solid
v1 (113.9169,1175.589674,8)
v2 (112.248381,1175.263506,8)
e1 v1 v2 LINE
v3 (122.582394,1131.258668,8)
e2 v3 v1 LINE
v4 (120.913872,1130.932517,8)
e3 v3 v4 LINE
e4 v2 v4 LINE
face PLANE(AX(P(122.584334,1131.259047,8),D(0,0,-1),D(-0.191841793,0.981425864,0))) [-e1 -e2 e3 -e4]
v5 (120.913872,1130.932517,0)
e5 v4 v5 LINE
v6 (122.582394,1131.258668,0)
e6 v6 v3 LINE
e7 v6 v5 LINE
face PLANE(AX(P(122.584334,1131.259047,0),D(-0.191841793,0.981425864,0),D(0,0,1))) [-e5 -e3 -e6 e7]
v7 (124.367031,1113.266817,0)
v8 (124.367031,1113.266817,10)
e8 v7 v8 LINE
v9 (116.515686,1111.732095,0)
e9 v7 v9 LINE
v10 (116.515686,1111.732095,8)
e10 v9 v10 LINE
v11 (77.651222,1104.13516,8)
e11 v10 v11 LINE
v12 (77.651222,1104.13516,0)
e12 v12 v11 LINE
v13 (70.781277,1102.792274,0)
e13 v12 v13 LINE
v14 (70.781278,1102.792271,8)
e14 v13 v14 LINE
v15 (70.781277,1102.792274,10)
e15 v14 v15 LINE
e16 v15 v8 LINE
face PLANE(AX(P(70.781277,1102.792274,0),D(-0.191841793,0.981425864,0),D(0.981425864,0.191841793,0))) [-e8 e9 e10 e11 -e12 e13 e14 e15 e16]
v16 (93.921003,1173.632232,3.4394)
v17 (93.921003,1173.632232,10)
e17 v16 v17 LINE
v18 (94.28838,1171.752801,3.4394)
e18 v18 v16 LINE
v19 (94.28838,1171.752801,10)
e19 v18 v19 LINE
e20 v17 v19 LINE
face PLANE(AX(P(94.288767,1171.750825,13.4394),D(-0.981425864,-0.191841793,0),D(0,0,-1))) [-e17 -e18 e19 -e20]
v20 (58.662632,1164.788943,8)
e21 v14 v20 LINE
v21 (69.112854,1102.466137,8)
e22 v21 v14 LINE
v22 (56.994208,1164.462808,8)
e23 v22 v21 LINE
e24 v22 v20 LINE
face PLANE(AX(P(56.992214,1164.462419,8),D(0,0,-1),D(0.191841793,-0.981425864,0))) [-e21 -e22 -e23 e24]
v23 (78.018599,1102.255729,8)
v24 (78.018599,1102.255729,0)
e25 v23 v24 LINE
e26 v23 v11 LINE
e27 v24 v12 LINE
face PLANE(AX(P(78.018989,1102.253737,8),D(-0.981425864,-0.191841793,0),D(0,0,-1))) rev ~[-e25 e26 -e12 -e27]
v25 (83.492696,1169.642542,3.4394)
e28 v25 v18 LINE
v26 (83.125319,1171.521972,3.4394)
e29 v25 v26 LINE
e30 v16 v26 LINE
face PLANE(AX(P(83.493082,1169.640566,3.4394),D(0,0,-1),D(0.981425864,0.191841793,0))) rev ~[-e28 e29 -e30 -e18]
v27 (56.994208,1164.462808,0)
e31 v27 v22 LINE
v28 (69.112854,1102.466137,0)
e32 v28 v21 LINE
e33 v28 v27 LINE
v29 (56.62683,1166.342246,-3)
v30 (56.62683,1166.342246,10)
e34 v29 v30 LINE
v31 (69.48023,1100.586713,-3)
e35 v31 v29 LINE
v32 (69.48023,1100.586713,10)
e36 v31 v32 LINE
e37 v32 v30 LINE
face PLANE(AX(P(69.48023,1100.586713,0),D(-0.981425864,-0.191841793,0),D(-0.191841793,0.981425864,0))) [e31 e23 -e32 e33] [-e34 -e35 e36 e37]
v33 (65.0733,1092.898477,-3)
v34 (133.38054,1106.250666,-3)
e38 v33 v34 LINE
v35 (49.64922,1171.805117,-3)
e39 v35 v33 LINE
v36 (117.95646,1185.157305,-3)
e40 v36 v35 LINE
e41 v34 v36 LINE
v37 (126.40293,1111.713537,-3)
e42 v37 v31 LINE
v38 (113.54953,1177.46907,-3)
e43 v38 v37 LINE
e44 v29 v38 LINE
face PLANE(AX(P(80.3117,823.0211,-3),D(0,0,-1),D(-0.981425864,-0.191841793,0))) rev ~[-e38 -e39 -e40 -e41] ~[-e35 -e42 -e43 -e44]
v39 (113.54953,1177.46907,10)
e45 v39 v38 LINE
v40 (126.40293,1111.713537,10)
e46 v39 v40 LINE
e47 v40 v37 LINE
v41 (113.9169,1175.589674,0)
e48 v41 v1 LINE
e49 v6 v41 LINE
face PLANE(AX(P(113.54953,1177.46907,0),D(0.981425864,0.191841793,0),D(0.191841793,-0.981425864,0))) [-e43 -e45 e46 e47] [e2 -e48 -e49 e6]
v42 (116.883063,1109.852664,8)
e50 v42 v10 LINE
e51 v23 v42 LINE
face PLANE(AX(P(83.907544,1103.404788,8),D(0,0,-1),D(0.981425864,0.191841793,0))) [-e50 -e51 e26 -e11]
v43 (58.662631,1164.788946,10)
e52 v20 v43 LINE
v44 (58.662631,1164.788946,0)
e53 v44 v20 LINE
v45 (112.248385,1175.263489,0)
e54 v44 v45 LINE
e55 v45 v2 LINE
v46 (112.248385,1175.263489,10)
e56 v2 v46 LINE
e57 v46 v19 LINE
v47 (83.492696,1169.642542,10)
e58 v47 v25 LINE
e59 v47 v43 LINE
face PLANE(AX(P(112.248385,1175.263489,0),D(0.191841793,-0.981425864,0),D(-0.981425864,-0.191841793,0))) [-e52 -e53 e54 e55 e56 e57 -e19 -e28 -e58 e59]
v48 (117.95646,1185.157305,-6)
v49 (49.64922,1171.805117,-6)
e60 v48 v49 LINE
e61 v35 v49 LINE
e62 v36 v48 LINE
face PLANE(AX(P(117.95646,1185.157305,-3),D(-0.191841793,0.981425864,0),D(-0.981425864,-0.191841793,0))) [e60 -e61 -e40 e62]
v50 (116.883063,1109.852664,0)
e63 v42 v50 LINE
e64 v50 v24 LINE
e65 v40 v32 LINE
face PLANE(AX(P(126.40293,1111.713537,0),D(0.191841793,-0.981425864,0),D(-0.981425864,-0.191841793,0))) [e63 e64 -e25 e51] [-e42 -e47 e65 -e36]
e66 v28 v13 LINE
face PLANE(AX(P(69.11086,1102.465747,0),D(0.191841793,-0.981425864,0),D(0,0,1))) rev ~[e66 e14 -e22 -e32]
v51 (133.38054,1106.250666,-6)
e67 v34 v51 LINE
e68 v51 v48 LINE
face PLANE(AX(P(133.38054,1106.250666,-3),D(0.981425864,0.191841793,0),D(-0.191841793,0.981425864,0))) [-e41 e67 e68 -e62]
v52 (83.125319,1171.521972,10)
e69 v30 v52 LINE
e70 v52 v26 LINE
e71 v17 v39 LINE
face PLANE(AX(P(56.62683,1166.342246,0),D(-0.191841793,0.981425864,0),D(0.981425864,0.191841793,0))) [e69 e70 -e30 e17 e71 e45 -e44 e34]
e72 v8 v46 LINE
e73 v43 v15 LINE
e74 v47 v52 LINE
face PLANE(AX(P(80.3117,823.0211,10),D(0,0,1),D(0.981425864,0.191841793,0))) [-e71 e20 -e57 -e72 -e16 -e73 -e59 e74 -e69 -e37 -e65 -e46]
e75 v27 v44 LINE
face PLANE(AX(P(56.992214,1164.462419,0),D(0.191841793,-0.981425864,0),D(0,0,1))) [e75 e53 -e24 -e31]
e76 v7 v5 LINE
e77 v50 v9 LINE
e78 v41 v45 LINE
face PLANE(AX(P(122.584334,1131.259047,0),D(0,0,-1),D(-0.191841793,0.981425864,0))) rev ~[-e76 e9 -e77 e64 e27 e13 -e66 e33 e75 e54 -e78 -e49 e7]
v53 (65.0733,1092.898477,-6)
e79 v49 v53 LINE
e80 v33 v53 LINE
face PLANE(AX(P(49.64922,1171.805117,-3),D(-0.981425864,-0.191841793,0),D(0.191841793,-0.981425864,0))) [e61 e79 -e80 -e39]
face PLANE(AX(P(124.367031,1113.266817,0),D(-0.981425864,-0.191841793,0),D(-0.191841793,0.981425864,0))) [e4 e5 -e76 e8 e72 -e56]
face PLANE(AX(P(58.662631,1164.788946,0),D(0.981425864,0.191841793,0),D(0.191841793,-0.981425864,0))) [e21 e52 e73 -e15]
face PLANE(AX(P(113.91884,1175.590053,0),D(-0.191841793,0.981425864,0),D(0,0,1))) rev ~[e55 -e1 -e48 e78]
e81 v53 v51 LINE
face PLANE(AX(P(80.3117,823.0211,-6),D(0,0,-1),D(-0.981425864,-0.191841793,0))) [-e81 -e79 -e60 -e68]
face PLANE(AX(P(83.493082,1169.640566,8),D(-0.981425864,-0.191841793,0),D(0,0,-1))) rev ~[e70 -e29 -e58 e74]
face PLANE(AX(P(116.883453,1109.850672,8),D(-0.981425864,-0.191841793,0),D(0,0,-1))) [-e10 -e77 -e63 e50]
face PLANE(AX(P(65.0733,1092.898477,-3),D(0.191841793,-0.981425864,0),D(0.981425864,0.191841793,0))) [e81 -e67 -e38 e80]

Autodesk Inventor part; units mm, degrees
ref_plane "YZ Plane" through (0, 0, 0) normal (1, 0, 0) x (0, 1, 0)
ref_plane "XZ Plane" through (0, 0, 0) normal (0, 1, 0) x (-1, 0, 0)
ref_plane "XY Plane" through (0, 0, 0) normal (0, 0, 1) x (1, 0, 0)
ref_plane "Work Plane1" through (80.3117, 823.0211, 0) normal (0, 0, 1) x (0.9814259, 0.1918418, 0)
sketch "Sketch1" plane through (80.3117, 823.0211, 0) normal (0, 0, 1) x (0.9814259, 0.1918418, 0)
  line L0 (98.9183, 339.573) -> (44.3184, 339.573)
  line L1 (44.3184, 339.573) -> (44.3184, 276.403)
  line L2 (44.3184, 276.403) -> (98.9183, 276.403)
  line L3 (98.9183, 276.403) -> (98.9183, 339.573)
  line L4 (98.9183, 339.573) -> (44.3184, 276.403)
  line L5 (42.6184, 341.488) -> (100.6184, 341.488)
  line L6 (100.6184, 341.488) -> (100.6184, 274.488)
  line L7 (100.6184, 274.488) -> (42.6184, 274.488)
  line L8 (42.6184, 274.488) -> (42.6184, 341.488)
  line L9 (42.6184, 341.488) -> (100.6184, 274.488) construction
  line L10 (100.6184, 341.488) -> (42.6184, 274.488) construction
  line L11 (98.9183, 339.573) -> (44.3184, 339.573)
  line L12 (44.3184, 339.573) -> (44.3184, 276.403)
  line L13 (44.3184, 276.403) -> (98.9183, 276.403)
  line L14 (98.9183, 276.403) -> (98.9183, 339.573)
  line L15 (98.9183, 339.573) -> (44.3184, 276.403)
  line L16 (42.6184, 341.488) -> (100.6184, 341.488)
  line L17 (100.6184, 341.488) -> (100.6184, 274.488)
  line L18 (100.6184, 274.488) -> (42.6184, 274.488)
  line L19 (42.6184, 274.488) -> (42.6184, 341.488)
  line L20 (42.6184, 341.488) -> (100.6184, 274.488) construction
  line L21 (100.6184, 341.488) -> (42.6184, 274.488) construction
  point P0 (-236.7099, -792.3271)
  point P1 (71.6184, 307.988)
  point P2 (0, 0)
  point P3 (71.6184, 307.988)
  dimension "d0" = 58
  dimension "d1" = 67
  dimension "d2" = 58
  dimension "d3" = 67
sketch "Sketch2" plane through (80.3117, 823.0211, 0) normal (0, 0, 1) x (0.9814259, 0.1918418, 0)
  line L0 (98.9183, 339.573) -> (44.3184, 339.573)
  line L1 (44.3184, 339.573) -> (44.3184, 276.403)
  line L2 (44.3184, 276.403) -> (98.9183, 276.403)
  line L3 (98.9183, 276.403) -> (98.9183, 339.573)
  line L4 (42.6184, 341.488) -> (100.6184, 341.488)
  line L5 (100.6184, 341.488) -> (100.6184, 274.488)
  line L6 (100.6184, 274.488) -> (42.6184, 274.488)
  line L7 (42.6184, 274.488) -> (42.6184, 341.488)
  line L8 (42.6184, 341.488) -> (100.6184, 274.488) construction
  line L9 (100.6184, 341.488) -> (42.6184, 274.488) construction
  line L10 (98.9183, 339.573) -> (44.3184, 339.573)
  line L11 (44.3184, 339.573) -> (44.3184, 276.403)
  line L12 (44.3184, 276.403) -> (98.9183, 276.403)
  line L13 (98.9183, 276.403) -> (98.9183, 339.573)
  line L14 (42.6184, 341.488) -> (100.6184, 341.488)
  line L15 (100.6184, 341.488) -> (100.6184, 274.488)
  line L16 (100.6184, 274.488) -> (42.6184, 274.488)
  line L17 (42.6184, 274.488) -> (42.6184, 341.488)
  line L18 (42.6184, 341.488) -> (100.6184, 274.488) construction
  line L19 (100.6184, 341.488) -> (42.6184, 274.488) construction
  point P0 (-236.7099, -792.3271)
  point P1 (0, 0)
  point P2 (71.6184, 307.988)
  point P3 (0, 0)
  point P4 (71.6184, 307.988)
  dimension "d4" = 58
  dimension "d5" = 67
  dimension "d6" = 58
  dimension "d7" = 67
extrude "Extrusion1" add sketch "Sketch1" along normal blind 10
extrude "Extrusion3" add sketch "Sketch2" against normal blind 3 contours L3 L2 L1 L0 | L4 L5 L6 L7
sketch "Sketch4" plane through (69.4802, 1100.5867, -3) normal (-0.9814259, -0.1918418, 0) x (0, 0, 1)
  line L0 (3, 65.085) -> (13, 65.085) projected
  line L1 (3, 1.915) -> (13, 1.915) projected
  line L2 (3, 65.085) -> (11, 65.085)
  line L3 (11, 65.085) -> (11, 1.915)
  line L4 (11, 1.915) -> (3, 1.915)
  line L5 (3, 1.915) -> (3, 65.085)
  point P0 (3, -1066.8151)
  dimension "d14" = 8
extrude "Extrusion4" cut sketch "Sketch4" against normal blind 3
sketch "Sketch5" plane through (126.4029, 1111.7135, -3) normal (0.1918418, -0.9814259, 0) x (0.9814259, 0.1918418, 0)
  line L0 (-56.3, 5) -> (-56.3, 3) projected
  line L1 (-41.56, 9.2) -> (-44.06, 9.2) projected
  line L2 (-14.575, 10) -> (-14.575, 9.2) projected
  line L3 (-9.7, 11) -> (-9.7, 3)
  line L4 (-46.3, 11) -> (-9.7, 11)
  line L5 (-9.7, 3) -> (-46.3, 3)
  line L6 (-58, 3) -> (-1.7, 3) projected
  line L7 (-46.3, 11) -> (-43.3, 11)
  line L8 (-43.3, 3) -> (-46.3, 3)
  line L9 (-46.3, 11) -> (-49.3, 11)
  line L10 (-49.3, 11) -> (-49.3, 3)
  line L11 (-49.3, 3) -> (-46.3, 3)
  point P0 (-337.3282, 3)
  dimension "d22" = 8
  dimension "d24" = 8
  dimension "d33" = 3
  dimension "d34" = 3
extrude "Extrusion5" cut sketch "Sketch5" against normal blind 3
sketch "Sketch6" plane through (113.5495, 1177.4691, 10) normal (0.9814259, 0.1918418, 0) x (0, 0, -1)
  line L0 (8, -44.46) -> (3, -44.46)
  line L1 (2, -65.085) -> (2, -1.915) projected
  line L2 (2, -65.085) -> (10, -65.085)
  line L3 (10, -65.085) -> (10, -47.085)
  line L4 (10, -47.085) -> (2, -47.085)
  line L5 (2, -47.085) -> (2, -65.085)
  line L6 (10, -65.085) -> (10, -1.915) projected
  line L7 (2, -47.085) -> (10, -47.085)
  line L8 (10, -47.085) -> (10, -1.915)
  line L9 (10, -1.915) -> (2, -1.915)
  line L10 (2, -1.915) -> (2, -47.085)
  point P0 (10, -1133.8151)
  dimension "d25" = 8
  dimension "d26" = 18
extrude "Extrusion6" cut sketch "Sketch6" against normal blind 3 contours L1 L9 L6 L4
sketch "Sketch7" plane through (56.9942, 1164.4628, 0) normal (0.1918418, -0.9814259, 0) x (0.9814259, 0.1918418, 0)
  line L0 (28.4907, 10.1469) -> (28.4907, 10.1469) projected
  line L1 (27, 8) -> (27, 3.4394)
  line L2 (27, 3.4394) -> (38, 3.4394)
  line L3 (38, 3.4394) -> (38, 8)
  line L4 (38, 3.4394) -> (27, 3.4394)
  line L5 (27, 3.4394) -> (27, 13.4394)
  line L6 (27, 13.4394) -> (38, 13.4394)
  line L7 (38, 13.4394) -> (38, 3.4394)
  point P0 (-279.3282, 0)
  point P1 (35.9907, 10.1469)
  dimension "d29" = 11
  dimension "d32" = 10
extrude "Extrusion7" cut sketch "Sketch7" against normal blind 3
sketch "Sketch8" plane through (80.3117, 823.0211, -3) normal (0, 0, -1) x (-0.9814259, -0.1918418, 0)
  line L0 (-42.6184, 341.488) -> (-100.6184, 341.488) projected
  line L1 (-100.6184, 341.488) -> (-100.6184, 274.488) projected
  line L2 (-42.6184, 274.488) -> (-42.6184, 341.488) projected
  line L3 (-100.6184, 274.488) -> (-42.6184, 274.488) projected
  line L4 (-106.4184, 348.188) -> (-36.8184, 348.188)
  line L5 (-36.8184, 348.188) -> (-36.8184, 267.788)
  line L6 (-36.8184, 267.788) -> (-106.4184, 267.788)
  line L7 (-106.4184, 267.788) -> (-106.4184, 348.188)
  point P0 (236.7099, -792.3271)
  point P1 (-71.6184, 341.488)
  point P2 (-71.6184, 307.988)
extrude "Extrusion8" add sketch "Sketch8" along normal blind 3 contours L2 L3 L1 L0 | L4 L5 L6 L7
properties part number "Syno"
